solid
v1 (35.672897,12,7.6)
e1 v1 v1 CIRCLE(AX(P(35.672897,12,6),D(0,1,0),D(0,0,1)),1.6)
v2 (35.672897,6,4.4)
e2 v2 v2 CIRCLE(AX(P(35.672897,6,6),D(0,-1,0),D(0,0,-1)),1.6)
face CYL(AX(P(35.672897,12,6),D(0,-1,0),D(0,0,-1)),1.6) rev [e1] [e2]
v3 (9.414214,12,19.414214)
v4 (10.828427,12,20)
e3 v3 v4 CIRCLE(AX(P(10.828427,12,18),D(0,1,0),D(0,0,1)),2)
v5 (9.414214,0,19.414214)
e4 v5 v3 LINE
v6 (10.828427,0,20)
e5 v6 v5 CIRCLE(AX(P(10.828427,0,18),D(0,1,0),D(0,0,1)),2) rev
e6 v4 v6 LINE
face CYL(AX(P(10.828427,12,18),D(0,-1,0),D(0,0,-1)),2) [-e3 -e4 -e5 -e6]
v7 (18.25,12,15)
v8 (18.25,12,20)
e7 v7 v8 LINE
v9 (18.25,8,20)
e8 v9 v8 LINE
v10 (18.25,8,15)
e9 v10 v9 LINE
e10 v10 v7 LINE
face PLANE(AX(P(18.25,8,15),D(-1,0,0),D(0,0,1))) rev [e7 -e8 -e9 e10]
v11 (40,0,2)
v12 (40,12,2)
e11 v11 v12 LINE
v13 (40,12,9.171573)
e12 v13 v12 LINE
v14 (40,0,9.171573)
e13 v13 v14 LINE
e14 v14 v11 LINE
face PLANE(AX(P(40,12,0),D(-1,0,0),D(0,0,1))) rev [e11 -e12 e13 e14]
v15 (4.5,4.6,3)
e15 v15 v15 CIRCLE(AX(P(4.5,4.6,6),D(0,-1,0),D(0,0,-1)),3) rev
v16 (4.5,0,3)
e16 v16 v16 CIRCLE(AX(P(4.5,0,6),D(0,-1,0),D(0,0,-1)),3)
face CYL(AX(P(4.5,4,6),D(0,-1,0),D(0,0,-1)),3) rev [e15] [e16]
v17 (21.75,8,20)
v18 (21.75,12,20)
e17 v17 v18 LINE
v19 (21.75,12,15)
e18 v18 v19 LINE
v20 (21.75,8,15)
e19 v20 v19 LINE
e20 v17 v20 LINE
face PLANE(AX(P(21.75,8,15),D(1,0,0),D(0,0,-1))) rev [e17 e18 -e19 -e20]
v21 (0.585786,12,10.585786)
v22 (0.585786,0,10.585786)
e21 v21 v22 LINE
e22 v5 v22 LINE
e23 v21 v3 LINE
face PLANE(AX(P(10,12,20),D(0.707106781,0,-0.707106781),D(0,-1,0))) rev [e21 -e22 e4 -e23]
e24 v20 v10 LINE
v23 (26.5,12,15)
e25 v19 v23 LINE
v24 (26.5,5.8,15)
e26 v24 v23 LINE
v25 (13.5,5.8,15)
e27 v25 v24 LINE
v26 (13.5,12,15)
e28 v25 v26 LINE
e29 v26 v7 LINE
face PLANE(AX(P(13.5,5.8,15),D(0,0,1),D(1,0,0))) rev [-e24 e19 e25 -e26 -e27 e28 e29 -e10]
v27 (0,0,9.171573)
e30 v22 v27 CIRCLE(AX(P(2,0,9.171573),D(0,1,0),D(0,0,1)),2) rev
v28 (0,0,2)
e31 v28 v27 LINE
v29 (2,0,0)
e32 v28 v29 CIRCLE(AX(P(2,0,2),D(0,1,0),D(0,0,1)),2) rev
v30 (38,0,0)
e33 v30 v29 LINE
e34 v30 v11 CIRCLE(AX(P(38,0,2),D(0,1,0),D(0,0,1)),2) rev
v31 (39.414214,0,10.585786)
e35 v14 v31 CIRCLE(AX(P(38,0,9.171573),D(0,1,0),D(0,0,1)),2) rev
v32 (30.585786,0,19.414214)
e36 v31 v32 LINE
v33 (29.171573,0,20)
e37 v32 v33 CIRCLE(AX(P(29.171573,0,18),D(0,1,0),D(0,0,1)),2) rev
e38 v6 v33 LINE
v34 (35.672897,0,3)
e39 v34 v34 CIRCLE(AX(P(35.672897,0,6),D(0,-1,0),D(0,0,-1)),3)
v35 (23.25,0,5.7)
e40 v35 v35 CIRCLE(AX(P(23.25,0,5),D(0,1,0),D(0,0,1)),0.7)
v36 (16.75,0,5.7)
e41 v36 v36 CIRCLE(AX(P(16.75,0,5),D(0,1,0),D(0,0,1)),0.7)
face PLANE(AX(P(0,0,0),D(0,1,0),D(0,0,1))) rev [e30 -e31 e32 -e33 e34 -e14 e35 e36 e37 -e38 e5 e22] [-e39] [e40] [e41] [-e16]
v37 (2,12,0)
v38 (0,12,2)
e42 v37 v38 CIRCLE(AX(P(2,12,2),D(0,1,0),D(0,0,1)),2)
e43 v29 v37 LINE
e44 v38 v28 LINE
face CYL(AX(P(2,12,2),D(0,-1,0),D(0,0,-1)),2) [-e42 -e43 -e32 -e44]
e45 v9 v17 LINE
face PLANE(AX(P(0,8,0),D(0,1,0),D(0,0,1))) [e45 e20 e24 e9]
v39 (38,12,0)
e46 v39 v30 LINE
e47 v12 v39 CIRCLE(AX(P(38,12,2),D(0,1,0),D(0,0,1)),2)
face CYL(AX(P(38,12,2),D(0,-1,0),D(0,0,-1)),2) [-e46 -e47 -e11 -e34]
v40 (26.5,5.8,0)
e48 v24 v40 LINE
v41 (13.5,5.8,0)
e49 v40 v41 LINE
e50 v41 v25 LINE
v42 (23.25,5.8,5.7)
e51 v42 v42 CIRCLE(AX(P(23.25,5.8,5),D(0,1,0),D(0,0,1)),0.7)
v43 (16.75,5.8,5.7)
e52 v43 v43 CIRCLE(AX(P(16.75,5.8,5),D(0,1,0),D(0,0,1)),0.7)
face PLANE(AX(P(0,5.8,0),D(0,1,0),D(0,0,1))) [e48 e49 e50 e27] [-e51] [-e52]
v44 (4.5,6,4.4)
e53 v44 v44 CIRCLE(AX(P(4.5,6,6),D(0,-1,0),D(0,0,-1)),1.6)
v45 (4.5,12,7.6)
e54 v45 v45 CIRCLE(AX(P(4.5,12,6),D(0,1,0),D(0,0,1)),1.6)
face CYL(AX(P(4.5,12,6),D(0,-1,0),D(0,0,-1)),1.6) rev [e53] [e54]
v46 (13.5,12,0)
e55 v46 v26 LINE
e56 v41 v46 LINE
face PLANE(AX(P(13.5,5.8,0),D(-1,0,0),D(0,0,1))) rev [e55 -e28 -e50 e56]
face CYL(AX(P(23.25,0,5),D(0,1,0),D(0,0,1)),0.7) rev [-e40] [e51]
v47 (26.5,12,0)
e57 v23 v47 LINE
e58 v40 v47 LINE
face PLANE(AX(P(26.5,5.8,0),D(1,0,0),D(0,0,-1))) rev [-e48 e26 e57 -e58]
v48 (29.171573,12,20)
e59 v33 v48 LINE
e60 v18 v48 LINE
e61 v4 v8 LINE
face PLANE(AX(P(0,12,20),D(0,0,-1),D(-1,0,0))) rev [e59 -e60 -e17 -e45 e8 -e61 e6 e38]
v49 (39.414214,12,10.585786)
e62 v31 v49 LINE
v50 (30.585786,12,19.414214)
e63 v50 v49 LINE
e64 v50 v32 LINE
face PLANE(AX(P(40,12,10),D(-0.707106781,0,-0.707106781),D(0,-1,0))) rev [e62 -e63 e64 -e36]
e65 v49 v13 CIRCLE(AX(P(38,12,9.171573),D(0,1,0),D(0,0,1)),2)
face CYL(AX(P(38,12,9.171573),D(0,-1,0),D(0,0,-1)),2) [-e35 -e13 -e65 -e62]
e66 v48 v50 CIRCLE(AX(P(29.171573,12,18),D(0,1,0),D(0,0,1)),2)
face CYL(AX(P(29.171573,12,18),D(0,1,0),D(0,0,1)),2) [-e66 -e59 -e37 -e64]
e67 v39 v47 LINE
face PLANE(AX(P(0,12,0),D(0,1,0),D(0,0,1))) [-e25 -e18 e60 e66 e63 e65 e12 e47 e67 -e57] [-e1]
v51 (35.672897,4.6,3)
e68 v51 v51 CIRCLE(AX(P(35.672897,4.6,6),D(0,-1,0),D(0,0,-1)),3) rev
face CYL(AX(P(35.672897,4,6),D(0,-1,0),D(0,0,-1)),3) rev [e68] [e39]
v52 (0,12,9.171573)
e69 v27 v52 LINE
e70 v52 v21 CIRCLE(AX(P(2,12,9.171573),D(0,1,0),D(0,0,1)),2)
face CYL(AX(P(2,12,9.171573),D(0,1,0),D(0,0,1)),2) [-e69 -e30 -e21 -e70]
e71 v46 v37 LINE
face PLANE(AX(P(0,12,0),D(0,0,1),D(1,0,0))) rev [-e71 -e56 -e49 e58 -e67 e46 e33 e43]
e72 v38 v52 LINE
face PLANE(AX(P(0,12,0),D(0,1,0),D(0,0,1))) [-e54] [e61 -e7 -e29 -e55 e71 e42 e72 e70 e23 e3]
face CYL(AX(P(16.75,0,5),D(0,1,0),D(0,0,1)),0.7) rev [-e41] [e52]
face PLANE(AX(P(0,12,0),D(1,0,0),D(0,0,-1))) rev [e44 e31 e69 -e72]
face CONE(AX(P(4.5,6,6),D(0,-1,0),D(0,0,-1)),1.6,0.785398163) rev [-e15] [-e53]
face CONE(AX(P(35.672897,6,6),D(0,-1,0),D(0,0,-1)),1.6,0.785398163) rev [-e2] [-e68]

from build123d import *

# Parameters (mm, degrees)
SKETCH_1_W          = 40
SKETCH_1_H          = 20
SKETCH_1_R          = 1.6
EXTRUDE_1_DEPTH     = 12
SKETCH_2_W          = 13
SKETCH_2_H          = 15
CUT_EXTRUDE_1_DEPTH = 6.2
SKETCH_3_W          = 3.5
SKETCH_3_H          = 5
CUT_EXTRUDE_2_DEPTH = 4
CHAMFER_1_SIZE      = 10
FILLET_1_R          = 2
SKETCH_4_R          = 0.7
CUT_EXTRUDE_3_DEPTH = 46.149086369
SKETCH_5_R          = 3
CUT_EXTRUDE_4_DEPTH = 4
CHAMFER_2_SIZE      = 2


with BuildPart() as part:
    # 草图1 → 凸台-拉伸1 (new body)
    with BuildSketch(Plane(origin=(0, 0, 0), x_dir=(1, 0, 0), z_dir=(0, 1, 0))):
        with Locations((20, -10)):
            Rectangle(SKETCH_1_W, SKETCH_1_H)
        with Locations(Location((4.5, -6, 0), (0, 0, 270))):
            Circle(SKETCH_1_R, mode=Mode.SUBTRACT)
        with Locations(Location((35.672897196, -6, 0), (0, 0, 270))):
            Circle(SKETCH_1_R, mode=Mode.SUBTRACT)
    extrude(amount=EXTRUDE_1_DEPTH)

    # 草图2 → 切除-拉伸1 (cut)
    with BuildSketch(Plane(origin=(0, 12, 0), x_dir=(1, 0, 0), z_dir=(0, 1, 0))):
        with Locations((20, -7.5)):
            Rectangle(SKETCH_2_W, SKETCH_2_H)
    extrude(amount=-CUT_EXTRUDE_1_DEPTH, mode=Mode.SUBTRACT)

    # 草图3 → 切除-拉伸2 (cut)
    with BuildSketch(Plane(origin=(0, 12, 0), x_dir=(1, 0, 0), z_dir=(0, 1, 0))):
        with Locations((20, -17.5)):
            Rectangle(SKETCH_3_W, SKETCH_3_H)
    extrude(amount=-CUT_EXTRUDE_2_DEPTH, mode=Mode.SUBTRACT)

    # 倒角1
    chamfer_1_edges = [part.edges().sort_by_distance(p)[0] for p in [
        (40, 6, 20),
        (0, 6, 20),
    ]]
    chamfer(chamfer_1_edges, length=CHAMFER_1_SIZE)

    # 圆角1
    fillet_1_edges = [part.edges().sort_by_distance(p)[0] for p in [
        (40, 6, 10),
        (10, 6, 20),
        (30, 6, 20),
        (0, 6, 10),
        (0, 6, 0),
        (40, 6, 0),
    ]]
    fillet(fillet_1_edges, radius=FILLET_1_R)

    # 草图4 → 切除-拉伸3 (cut, through all)
    with BuildSketch(Plane(origin=(0, 5.8, 0), x_dir=(1, 0, 0), z_dir=(0, 1, 0))):
        with Locations(Location((16.75, -5, 0), (0, 0, 270))):
            Circle(SKETCH_4_R)
        with Locations(Location((23.25, -5, 0), (0, 0, 270))):
            Circle(SKETCH_4_R)
    extrude(amount=-CUT_EXTRUDE_3_DEPTH, mode=Mode.SUBTRACT)

    # 草图5 → 切除-拉伸4 (cut)
    with BuildSketch(Plane(origin=(0, 0, 0), x_dir=(-1, 0, 0), z_dir=(0, -1, 0))):
        with Locations(Location((-35.672897196, -6, 0), (0, 0, 90))):
            Circle(SKETCH_5_R)
        with Locations(Location((-4.5, -6, 0), (0, 0, 90))):
            Circle(SKETCH_5_R)
    extrude(amount=-CUT_EXTRUDE_4_DEPTH, mode=Mode.SUBTRACT)

    # 倒角2
    # the kernel refuses this chamfer: 2 mm, written as the material it takes off along each edge
    with BuildSketch(Plane(origin=(35.672897196, 4, 6), x_dir=(0, 0, 1), z_dir=(1, 0, 0))) as chamfer_2_piece_1_section:
        Polygon((1.6 + CHAMFER_2_SIZE, 0), (1.6, -CHAMFER_2_SIZE), (1.6, 0), align=None)
    chamfer_2_piece_1 = revolve(axis=Axis((35.672897196, 4, 6), (0, -1, 0)), mode=Mode.PRIVATE)
    chamfer_2_piece_1 = chamfer_2_piece_1 & Plane(origin=(35.672897196, 5.307163584, 6), x_dir=(0, 0, -1), z_dir=(0, -1, 0)) * Cylinder(3, 15, mode=Mode.PRIVATE)
    add(chamfer_2_piece_1, mode=Mode.SUBTRACT)
    with BuildSketch(Plane(origin=(4.5, 4, 6), x_dir=(0, 0, 1), z_dir=(1, 0, 0))) as chamfer_2_piece_2_section:
        Polygon((1.6 + CHAMFER_2_SIZE, 0), (1.6, -CHAMFER_2_SIZE), (1.6, 0), align=None)
    chamfer_2_piece_2 = revolve(axis=Axis((4.5, 4, 6), (0, -1, 0)), mode=Mode.PRIVATE)
    chamfer_2_piece_2 = chamfer_2_piece_2 & Plane(origin=(4.5, 5.307163584, 6), x_dir=(0, 0, -1), z_dir=(0, -1, 0)) * Cylinder(3, 15, mode=Mode.PRIVATE)
    add(chamfer_2_piece_2, mode=Mode.SUBTRACT)


solid = part.part
